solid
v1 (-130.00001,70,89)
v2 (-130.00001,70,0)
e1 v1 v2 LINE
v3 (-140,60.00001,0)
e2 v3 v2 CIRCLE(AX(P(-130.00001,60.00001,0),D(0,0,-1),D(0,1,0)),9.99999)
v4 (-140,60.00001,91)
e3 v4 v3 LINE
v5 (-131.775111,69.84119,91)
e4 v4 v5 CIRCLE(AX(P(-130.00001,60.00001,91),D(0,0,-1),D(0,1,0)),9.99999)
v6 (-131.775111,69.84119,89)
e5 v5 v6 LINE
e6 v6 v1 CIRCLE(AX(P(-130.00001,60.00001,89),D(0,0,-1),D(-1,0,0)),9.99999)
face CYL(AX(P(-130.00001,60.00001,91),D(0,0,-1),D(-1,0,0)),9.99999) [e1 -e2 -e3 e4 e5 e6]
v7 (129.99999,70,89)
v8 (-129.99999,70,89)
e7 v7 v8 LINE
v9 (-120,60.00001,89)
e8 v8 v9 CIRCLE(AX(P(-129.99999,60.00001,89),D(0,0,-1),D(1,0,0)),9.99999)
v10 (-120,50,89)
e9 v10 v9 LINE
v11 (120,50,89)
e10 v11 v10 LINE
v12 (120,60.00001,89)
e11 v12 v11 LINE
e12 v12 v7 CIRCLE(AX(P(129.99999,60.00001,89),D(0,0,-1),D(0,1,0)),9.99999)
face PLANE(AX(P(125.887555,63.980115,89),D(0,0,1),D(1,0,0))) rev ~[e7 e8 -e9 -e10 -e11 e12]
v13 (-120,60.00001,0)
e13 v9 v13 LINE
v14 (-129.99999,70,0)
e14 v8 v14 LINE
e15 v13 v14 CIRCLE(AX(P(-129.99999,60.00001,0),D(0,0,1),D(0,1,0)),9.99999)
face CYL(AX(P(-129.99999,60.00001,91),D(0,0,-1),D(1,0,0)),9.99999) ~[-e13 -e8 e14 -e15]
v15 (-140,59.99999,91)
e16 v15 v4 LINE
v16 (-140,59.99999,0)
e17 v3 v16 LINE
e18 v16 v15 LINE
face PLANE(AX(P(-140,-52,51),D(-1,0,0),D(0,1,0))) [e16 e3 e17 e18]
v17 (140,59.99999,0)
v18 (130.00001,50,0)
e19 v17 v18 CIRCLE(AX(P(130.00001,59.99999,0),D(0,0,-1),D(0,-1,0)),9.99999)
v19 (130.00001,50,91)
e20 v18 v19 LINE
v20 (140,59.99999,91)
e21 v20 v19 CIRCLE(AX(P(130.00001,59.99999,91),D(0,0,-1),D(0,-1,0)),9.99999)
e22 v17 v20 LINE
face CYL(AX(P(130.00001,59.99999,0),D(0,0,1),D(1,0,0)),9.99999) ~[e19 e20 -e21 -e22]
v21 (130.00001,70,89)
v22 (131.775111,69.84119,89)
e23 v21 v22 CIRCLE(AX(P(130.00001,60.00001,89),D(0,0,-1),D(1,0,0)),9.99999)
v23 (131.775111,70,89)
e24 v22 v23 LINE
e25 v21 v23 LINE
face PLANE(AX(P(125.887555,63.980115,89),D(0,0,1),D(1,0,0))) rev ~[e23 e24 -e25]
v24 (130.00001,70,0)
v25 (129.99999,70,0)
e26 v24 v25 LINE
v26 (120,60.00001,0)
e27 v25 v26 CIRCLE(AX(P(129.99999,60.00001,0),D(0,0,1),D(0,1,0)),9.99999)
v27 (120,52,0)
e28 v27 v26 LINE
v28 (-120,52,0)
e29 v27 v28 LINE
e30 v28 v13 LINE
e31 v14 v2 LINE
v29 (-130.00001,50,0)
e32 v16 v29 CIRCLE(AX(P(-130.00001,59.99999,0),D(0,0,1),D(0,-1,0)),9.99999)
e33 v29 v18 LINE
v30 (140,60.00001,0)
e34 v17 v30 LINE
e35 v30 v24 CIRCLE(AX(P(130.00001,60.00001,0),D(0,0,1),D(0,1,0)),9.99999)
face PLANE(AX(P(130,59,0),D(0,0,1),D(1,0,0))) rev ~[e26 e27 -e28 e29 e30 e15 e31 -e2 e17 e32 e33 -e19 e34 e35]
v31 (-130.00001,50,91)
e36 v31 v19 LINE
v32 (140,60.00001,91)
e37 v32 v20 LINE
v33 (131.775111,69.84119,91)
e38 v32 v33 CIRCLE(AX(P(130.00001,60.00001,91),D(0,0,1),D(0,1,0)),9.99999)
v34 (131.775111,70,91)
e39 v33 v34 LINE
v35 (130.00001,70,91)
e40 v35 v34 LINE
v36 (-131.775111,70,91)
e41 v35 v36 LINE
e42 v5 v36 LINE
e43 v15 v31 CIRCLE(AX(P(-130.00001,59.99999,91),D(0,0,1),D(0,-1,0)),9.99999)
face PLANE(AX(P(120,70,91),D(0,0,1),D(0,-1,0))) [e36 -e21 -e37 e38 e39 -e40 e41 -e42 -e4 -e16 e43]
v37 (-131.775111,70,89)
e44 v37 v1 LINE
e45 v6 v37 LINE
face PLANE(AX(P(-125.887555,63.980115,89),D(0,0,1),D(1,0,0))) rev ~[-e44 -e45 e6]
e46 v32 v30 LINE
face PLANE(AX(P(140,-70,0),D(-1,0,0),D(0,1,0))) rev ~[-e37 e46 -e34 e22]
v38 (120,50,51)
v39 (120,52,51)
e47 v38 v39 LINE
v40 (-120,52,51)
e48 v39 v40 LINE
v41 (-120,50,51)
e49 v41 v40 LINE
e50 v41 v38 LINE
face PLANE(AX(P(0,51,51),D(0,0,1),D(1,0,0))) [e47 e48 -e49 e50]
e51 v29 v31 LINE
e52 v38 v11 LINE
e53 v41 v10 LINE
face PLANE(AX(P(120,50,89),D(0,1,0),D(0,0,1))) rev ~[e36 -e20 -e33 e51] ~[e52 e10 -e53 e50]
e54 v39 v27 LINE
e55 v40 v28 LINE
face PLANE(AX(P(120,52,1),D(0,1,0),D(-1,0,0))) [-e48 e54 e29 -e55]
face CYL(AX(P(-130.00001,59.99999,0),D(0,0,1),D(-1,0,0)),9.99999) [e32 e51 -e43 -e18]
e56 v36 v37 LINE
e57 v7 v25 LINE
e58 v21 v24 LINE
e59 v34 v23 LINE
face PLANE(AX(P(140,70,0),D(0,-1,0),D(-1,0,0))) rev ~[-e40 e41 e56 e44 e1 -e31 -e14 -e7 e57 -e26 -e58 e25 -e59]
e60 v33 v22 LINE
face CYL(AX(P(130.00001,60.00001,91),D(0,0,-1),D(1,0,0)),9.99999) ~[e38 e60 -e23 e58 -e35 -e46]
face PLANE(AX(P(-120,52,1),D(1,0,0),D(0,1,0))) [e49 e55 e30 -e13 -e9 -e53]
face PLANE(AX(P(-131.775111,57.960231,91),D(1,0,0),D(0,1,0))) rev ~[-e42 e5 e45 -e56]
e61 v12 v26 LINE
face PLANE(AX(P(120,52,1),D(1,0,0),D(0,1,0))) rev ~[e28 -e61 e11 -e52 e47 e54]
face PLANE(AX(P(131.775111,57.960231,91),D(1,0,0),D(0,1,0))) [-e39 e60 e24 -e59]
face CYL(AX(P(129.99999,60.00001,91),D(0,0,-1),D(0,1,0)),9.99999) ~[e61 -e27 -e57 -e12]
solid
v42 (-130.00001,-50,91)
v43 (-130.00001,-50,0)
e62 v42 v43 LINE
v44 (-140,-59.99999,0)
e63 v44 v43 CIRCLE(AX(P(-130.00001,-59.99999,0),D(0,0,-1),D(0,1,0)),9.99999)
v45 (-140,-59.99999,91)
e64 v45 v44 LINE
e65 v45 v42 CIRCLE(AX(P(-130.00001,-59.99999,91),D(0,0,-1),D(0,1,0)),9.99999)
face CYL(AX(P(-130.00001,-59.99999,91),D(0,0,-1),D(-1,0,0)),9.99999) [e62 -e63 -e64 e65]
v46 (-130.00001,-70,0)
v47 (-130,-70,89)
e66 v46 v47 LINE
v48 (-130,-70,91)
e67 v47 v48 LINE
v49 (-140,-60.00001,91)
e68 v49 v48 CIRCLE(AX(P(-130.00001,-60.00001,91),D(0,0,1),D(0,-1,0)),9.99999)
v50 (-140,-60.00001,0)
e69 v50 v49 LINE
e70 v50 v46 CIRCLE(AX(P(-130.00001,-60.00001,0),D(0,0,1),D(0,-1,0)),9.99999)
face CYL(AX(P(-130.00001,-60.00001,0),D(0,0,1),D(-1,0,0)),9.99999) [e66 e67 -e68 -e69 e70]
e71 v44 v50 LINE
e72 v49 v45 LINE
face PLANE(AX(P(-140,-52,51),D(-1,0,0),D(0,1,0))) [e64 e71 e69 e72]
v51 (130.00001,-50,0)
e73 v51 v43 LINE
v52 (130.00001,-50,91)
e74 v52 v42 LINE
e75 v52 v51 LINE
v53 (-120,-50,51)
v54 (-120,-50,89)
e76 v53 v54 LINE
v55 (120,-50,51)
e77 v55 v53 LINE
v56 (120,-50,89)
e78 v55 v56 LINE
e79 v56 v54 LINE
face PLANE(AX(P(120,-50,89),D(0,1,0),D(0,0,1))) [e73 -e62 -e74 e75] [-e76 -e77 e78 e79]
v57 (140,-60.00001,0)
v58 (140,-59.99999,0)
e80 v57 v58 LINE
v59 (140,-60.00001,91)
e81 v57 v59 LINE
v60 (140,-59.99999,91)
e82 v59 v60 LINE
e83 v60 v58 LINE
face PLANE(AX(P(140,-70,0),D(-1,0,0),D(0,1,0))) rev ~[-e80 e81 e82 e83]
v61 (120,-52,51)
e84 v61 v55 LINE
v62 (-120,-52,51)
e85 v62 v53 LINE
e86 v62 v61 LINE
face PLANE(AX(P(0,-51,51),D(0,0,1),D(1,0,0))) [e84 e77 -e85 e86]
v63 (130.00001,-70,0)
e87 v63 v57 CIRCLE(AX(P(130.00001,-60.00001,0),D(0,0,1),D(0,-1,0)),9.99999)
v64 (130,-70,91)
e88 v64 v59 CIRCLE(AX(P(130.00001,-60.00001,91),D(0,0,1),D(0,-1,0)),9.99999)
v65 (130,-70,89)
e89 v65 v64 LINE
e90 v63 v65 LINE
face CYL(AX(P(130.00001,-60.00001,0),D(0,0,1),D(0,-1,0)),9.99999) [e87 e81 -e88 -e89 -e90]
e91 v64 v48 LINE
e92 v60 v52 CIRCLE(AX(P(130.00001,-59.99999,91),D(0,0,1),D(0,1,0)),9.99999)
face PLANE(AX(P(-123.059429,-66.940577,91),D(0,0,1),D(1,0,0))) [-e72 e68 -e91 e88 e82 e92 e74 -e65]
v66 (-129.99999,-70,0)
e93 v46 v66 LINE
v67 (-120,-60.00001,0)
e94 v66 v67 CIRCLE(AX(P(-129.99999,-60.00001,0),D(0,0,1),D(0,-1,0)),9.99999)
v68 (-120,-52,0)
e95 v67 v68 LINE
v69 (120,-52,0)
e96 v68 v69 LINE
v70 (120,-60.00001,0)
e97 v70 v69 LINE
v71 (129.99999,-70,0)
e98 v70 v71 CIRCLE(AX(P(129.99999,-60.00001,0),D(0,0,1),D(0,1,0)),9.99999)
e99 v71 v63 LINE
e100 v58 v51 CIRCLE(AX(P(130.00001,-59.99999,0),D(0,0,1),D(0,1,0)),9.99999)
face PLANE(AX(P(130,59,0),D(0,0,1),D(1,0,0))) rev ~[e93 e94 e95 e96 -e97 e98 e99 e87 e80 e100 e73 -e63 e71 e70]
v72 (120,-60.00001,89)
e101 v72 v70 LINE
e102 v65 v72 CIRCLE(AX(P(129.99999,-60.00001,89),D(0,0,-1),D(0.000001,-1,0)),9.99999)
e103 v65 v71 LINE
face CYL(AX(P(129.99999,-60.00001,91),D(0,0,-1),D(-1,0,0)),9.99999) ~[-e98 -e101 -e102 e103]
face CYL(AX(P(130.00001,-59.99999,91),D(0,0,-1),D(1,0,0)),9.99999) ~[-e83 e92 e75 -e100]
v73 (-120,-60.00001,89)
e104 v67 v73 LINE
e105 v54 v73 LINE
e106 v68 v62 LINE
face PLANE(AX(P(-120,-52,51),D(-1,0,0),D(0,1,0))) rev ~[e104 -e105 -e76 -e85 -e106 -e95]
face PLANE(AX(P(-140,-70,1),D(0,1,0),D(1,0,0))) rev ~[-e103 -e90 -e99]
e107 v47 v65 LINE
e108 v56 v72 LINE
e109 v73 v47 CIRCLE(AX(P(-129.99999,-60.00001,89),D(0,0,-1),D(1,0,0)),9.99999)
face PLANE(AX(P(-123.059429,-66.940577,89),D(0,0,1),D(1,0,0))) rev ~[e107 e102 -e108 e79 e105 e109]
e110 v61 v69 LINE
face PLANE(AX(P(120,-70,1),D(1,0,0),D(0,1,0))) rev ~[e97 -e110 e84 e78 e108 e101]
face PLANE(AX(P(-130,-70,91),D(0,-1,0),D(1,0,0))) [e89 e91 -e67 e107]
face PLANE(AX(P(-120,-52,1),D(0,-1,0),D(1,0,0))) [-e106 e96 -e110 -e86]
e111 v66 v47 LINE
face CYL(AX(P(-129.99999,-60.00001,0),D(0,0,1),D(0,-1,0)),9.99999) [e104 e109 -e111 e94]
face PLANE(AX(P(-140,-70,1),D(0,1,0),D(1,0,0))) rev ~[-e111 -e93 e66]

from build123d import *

# Parameters (mm, degrees)
F0_W      = 20
F0_H      = 18
F1_DEPTH  = 1
F3_DEPTH  = 50
F2_W      = 20
F2_H      = 18
F4_DEPTH  = 90
F5_W      = 20
F5_H      = 2
F6_DEPTH  = 40
F7_DEPTH  = 25
F9_R      = 9.99999
F10_W     = 9.99999
F10_H     = 2
F10_W_2   = 10.00001
F11_DEPTH = 240
F13_DEPTH = 2
F10_W_3   = 20
F14_DEPTH = 240
F12_W     = 11.77511096
F12_H     = 12.0397691429
F15_DEPTH = 2


# Not quite as in the source:
# - a fillet or chamfer is up to 0.001 mm smaller than in the source, because OpenCascade refuses the exact size
# - ends of sketch curves that miss each other by under 0.0002 mm in the source are joined
# - a feature of the source that left no trace in its solid (it failed there, or was rolled back) is left out


with BuildPart() as f1:
    # F0 (on Top) → F1 (new body)
    with BuildSketch(Plane.XY):
        with Locations((130, 59)):
            Rectangle(F0_W, F0_H)
        with Locations((-130, 59)):
            Rectangle(F0_W, F0_H)
        Polygon((-140, -70), (140, -70), (140, -68), (120, -68), (-120, -68), (-140, -68), align=None)
        with Locations((-130, -59)):
            Rectangle(F0_W, F0_H)
        Polygon((120, -50), (140, -50), (140, 50), (120, 50), (120, 68), (-120, 68), (-120, 50), (-140, 50), (-140, -50), (-120, -50), (-120, -68), (120, -68), align=None)
        Polygon((120, 68), (140, 68), (140, 70), (-140, 70), (-140, 68), (-120, 68), align=None)
        with Locations((130, -59)):
            Rectangle(F0_W, F0_H)
    extrude(amount=F1_DEPTH)

    # F2 (on face) → F3 (join)
    with BuildSketch(Plane.XY.offset(1)):
        Polygon((-140, 52), (-140, 50), (140, 50), (140, 52), (120, 52), (-120, 52), align=None)
        Polygon((-140, -50), (-140, -52), (-120, -52), (120, -52), (140, -52), (140, -50), align=None)
    extrude(amount=F3_DEPTH)

    # F2 (on face) → F4 (join)
    with BuildSketch(Plane.XY.offset(1)):
        with Locations((-130, -61)):
            Rectangle(F2_W, F2_H)
        with Locations((130, -61)):
            Rectangle(F2_W, F2_H)
        with Locations((130, 61)):
            Rectangle(F2_W, F2_H)
        with Locations((-130, 61)):
            Rectangle(F2_W, F2_H)
    extrude(amount=F4_DEPTH)

    # F5 (on face) → F6 (join)
    with BuildSketch(Plane.XY.offset(51)):
        with Locations((-130, -51)):
            Rectangle(F5_W, F5_H)
        Polygon((-140, 50), (-120, 50), (-120, 52), (-120, 52.0472601056), (-140, 52.0472601056), align=None)
        with Locations((130, -51)):
            Rectangle(F5_W, F5_H)
        with Locations((130, 51)):
            Rectangle(F5_W, F5_H)
    extrude(amount=F6_DEPTH)

    # F7 (cut): faces of the model
    f7_faces = [f1.faces().sort_by_distance(p)[0] for p in [
        (0, -61, 1),
        (0, 0, 1),
        (0, 61, 1),
    ]]
    extrude(f7_faces, amount=-F7_DEPTH, mode=Mode.SUBTRACT)

    # F9 (radius 10 in the source; OpenCascade refuses exactly that, so slightly less here)
    f9_edges = [f1.edges().sort_by_distance(p)[0] for p in [
        (140, 50, 45.5),
        (140, 70, 45.5),
        (140, -70, 45.5),
        (140, -50, 45.5),
        (120, -70, 45.5),
        (120, 70, 45.5),
        (-120, 70, 45.5),
        (-140, 50, 45.5),
        (-140, 70, 45.5),
        (-120, -70, 45.5),
        (-140, -70, 45.5),
        (-140, -50, 45.5),
    ]]
    fillet(f9_edges, radius=F9_R)

    # F10 (on face) → F11 (join)
    with BuildSketch(Plane(origin=(120, 0, 0), x_dir=(0, -1, 0), z_dir=(-1, 0, 0))):
        with Locations((65.000005, 90)):
            Rectangle(F10_W, F10_H)
        with Locations((55.000005, 90)):
            Rectangle(F10_W_2, F10_H)
    extrude(amount=F11_DEPTH)

    # F12 (on face) → F13 (join)
    with BuildSketch(Plane.XY.offset(91)):
        with BuildLine():
            Line((-130, -70), (-120, -70))
            Line((-120, -70), (-120, -60.00001))
            ThreePointArc((-120, -60.00001), (-122.9289292592, -67.0710707408), (-130, -70))
        make_face()
        with BuildLine():
            Line((120, -60.00001), (120, -70))
            Line((120, -70), (130, -70))
            ThreePointArc((130, -70), (122.9289292592, -67.0710707408), (120, -60.00001))
        make_face()
    extrude(amount=-F13_DEPTH)

    # F10 (on face) → F14 (join)
    with BuildSketch(Plane(origin=(120, 0, 0), x_dir=(0, -1, 0), z_dir=(-1, 0, 0))):
        with Locations((-60, 90)):
            Rectangle(F10_W_3, F10_H)
    extrude(amount=F14_DEPTH)

    # F12 (on face) → F15 (join)
    with BuildSketch(Plane.XY.offset(91)):
        with Locations((125.88755548, 63.9801154286)):
            Rectangle(F12_W, F12_H)
        with Locations((-125.88755548, 63.9801154286)):
            Rectangle(F12_W, F12_H)
    extrude(amount=-F15_DEPTH)


solid = f1.part
